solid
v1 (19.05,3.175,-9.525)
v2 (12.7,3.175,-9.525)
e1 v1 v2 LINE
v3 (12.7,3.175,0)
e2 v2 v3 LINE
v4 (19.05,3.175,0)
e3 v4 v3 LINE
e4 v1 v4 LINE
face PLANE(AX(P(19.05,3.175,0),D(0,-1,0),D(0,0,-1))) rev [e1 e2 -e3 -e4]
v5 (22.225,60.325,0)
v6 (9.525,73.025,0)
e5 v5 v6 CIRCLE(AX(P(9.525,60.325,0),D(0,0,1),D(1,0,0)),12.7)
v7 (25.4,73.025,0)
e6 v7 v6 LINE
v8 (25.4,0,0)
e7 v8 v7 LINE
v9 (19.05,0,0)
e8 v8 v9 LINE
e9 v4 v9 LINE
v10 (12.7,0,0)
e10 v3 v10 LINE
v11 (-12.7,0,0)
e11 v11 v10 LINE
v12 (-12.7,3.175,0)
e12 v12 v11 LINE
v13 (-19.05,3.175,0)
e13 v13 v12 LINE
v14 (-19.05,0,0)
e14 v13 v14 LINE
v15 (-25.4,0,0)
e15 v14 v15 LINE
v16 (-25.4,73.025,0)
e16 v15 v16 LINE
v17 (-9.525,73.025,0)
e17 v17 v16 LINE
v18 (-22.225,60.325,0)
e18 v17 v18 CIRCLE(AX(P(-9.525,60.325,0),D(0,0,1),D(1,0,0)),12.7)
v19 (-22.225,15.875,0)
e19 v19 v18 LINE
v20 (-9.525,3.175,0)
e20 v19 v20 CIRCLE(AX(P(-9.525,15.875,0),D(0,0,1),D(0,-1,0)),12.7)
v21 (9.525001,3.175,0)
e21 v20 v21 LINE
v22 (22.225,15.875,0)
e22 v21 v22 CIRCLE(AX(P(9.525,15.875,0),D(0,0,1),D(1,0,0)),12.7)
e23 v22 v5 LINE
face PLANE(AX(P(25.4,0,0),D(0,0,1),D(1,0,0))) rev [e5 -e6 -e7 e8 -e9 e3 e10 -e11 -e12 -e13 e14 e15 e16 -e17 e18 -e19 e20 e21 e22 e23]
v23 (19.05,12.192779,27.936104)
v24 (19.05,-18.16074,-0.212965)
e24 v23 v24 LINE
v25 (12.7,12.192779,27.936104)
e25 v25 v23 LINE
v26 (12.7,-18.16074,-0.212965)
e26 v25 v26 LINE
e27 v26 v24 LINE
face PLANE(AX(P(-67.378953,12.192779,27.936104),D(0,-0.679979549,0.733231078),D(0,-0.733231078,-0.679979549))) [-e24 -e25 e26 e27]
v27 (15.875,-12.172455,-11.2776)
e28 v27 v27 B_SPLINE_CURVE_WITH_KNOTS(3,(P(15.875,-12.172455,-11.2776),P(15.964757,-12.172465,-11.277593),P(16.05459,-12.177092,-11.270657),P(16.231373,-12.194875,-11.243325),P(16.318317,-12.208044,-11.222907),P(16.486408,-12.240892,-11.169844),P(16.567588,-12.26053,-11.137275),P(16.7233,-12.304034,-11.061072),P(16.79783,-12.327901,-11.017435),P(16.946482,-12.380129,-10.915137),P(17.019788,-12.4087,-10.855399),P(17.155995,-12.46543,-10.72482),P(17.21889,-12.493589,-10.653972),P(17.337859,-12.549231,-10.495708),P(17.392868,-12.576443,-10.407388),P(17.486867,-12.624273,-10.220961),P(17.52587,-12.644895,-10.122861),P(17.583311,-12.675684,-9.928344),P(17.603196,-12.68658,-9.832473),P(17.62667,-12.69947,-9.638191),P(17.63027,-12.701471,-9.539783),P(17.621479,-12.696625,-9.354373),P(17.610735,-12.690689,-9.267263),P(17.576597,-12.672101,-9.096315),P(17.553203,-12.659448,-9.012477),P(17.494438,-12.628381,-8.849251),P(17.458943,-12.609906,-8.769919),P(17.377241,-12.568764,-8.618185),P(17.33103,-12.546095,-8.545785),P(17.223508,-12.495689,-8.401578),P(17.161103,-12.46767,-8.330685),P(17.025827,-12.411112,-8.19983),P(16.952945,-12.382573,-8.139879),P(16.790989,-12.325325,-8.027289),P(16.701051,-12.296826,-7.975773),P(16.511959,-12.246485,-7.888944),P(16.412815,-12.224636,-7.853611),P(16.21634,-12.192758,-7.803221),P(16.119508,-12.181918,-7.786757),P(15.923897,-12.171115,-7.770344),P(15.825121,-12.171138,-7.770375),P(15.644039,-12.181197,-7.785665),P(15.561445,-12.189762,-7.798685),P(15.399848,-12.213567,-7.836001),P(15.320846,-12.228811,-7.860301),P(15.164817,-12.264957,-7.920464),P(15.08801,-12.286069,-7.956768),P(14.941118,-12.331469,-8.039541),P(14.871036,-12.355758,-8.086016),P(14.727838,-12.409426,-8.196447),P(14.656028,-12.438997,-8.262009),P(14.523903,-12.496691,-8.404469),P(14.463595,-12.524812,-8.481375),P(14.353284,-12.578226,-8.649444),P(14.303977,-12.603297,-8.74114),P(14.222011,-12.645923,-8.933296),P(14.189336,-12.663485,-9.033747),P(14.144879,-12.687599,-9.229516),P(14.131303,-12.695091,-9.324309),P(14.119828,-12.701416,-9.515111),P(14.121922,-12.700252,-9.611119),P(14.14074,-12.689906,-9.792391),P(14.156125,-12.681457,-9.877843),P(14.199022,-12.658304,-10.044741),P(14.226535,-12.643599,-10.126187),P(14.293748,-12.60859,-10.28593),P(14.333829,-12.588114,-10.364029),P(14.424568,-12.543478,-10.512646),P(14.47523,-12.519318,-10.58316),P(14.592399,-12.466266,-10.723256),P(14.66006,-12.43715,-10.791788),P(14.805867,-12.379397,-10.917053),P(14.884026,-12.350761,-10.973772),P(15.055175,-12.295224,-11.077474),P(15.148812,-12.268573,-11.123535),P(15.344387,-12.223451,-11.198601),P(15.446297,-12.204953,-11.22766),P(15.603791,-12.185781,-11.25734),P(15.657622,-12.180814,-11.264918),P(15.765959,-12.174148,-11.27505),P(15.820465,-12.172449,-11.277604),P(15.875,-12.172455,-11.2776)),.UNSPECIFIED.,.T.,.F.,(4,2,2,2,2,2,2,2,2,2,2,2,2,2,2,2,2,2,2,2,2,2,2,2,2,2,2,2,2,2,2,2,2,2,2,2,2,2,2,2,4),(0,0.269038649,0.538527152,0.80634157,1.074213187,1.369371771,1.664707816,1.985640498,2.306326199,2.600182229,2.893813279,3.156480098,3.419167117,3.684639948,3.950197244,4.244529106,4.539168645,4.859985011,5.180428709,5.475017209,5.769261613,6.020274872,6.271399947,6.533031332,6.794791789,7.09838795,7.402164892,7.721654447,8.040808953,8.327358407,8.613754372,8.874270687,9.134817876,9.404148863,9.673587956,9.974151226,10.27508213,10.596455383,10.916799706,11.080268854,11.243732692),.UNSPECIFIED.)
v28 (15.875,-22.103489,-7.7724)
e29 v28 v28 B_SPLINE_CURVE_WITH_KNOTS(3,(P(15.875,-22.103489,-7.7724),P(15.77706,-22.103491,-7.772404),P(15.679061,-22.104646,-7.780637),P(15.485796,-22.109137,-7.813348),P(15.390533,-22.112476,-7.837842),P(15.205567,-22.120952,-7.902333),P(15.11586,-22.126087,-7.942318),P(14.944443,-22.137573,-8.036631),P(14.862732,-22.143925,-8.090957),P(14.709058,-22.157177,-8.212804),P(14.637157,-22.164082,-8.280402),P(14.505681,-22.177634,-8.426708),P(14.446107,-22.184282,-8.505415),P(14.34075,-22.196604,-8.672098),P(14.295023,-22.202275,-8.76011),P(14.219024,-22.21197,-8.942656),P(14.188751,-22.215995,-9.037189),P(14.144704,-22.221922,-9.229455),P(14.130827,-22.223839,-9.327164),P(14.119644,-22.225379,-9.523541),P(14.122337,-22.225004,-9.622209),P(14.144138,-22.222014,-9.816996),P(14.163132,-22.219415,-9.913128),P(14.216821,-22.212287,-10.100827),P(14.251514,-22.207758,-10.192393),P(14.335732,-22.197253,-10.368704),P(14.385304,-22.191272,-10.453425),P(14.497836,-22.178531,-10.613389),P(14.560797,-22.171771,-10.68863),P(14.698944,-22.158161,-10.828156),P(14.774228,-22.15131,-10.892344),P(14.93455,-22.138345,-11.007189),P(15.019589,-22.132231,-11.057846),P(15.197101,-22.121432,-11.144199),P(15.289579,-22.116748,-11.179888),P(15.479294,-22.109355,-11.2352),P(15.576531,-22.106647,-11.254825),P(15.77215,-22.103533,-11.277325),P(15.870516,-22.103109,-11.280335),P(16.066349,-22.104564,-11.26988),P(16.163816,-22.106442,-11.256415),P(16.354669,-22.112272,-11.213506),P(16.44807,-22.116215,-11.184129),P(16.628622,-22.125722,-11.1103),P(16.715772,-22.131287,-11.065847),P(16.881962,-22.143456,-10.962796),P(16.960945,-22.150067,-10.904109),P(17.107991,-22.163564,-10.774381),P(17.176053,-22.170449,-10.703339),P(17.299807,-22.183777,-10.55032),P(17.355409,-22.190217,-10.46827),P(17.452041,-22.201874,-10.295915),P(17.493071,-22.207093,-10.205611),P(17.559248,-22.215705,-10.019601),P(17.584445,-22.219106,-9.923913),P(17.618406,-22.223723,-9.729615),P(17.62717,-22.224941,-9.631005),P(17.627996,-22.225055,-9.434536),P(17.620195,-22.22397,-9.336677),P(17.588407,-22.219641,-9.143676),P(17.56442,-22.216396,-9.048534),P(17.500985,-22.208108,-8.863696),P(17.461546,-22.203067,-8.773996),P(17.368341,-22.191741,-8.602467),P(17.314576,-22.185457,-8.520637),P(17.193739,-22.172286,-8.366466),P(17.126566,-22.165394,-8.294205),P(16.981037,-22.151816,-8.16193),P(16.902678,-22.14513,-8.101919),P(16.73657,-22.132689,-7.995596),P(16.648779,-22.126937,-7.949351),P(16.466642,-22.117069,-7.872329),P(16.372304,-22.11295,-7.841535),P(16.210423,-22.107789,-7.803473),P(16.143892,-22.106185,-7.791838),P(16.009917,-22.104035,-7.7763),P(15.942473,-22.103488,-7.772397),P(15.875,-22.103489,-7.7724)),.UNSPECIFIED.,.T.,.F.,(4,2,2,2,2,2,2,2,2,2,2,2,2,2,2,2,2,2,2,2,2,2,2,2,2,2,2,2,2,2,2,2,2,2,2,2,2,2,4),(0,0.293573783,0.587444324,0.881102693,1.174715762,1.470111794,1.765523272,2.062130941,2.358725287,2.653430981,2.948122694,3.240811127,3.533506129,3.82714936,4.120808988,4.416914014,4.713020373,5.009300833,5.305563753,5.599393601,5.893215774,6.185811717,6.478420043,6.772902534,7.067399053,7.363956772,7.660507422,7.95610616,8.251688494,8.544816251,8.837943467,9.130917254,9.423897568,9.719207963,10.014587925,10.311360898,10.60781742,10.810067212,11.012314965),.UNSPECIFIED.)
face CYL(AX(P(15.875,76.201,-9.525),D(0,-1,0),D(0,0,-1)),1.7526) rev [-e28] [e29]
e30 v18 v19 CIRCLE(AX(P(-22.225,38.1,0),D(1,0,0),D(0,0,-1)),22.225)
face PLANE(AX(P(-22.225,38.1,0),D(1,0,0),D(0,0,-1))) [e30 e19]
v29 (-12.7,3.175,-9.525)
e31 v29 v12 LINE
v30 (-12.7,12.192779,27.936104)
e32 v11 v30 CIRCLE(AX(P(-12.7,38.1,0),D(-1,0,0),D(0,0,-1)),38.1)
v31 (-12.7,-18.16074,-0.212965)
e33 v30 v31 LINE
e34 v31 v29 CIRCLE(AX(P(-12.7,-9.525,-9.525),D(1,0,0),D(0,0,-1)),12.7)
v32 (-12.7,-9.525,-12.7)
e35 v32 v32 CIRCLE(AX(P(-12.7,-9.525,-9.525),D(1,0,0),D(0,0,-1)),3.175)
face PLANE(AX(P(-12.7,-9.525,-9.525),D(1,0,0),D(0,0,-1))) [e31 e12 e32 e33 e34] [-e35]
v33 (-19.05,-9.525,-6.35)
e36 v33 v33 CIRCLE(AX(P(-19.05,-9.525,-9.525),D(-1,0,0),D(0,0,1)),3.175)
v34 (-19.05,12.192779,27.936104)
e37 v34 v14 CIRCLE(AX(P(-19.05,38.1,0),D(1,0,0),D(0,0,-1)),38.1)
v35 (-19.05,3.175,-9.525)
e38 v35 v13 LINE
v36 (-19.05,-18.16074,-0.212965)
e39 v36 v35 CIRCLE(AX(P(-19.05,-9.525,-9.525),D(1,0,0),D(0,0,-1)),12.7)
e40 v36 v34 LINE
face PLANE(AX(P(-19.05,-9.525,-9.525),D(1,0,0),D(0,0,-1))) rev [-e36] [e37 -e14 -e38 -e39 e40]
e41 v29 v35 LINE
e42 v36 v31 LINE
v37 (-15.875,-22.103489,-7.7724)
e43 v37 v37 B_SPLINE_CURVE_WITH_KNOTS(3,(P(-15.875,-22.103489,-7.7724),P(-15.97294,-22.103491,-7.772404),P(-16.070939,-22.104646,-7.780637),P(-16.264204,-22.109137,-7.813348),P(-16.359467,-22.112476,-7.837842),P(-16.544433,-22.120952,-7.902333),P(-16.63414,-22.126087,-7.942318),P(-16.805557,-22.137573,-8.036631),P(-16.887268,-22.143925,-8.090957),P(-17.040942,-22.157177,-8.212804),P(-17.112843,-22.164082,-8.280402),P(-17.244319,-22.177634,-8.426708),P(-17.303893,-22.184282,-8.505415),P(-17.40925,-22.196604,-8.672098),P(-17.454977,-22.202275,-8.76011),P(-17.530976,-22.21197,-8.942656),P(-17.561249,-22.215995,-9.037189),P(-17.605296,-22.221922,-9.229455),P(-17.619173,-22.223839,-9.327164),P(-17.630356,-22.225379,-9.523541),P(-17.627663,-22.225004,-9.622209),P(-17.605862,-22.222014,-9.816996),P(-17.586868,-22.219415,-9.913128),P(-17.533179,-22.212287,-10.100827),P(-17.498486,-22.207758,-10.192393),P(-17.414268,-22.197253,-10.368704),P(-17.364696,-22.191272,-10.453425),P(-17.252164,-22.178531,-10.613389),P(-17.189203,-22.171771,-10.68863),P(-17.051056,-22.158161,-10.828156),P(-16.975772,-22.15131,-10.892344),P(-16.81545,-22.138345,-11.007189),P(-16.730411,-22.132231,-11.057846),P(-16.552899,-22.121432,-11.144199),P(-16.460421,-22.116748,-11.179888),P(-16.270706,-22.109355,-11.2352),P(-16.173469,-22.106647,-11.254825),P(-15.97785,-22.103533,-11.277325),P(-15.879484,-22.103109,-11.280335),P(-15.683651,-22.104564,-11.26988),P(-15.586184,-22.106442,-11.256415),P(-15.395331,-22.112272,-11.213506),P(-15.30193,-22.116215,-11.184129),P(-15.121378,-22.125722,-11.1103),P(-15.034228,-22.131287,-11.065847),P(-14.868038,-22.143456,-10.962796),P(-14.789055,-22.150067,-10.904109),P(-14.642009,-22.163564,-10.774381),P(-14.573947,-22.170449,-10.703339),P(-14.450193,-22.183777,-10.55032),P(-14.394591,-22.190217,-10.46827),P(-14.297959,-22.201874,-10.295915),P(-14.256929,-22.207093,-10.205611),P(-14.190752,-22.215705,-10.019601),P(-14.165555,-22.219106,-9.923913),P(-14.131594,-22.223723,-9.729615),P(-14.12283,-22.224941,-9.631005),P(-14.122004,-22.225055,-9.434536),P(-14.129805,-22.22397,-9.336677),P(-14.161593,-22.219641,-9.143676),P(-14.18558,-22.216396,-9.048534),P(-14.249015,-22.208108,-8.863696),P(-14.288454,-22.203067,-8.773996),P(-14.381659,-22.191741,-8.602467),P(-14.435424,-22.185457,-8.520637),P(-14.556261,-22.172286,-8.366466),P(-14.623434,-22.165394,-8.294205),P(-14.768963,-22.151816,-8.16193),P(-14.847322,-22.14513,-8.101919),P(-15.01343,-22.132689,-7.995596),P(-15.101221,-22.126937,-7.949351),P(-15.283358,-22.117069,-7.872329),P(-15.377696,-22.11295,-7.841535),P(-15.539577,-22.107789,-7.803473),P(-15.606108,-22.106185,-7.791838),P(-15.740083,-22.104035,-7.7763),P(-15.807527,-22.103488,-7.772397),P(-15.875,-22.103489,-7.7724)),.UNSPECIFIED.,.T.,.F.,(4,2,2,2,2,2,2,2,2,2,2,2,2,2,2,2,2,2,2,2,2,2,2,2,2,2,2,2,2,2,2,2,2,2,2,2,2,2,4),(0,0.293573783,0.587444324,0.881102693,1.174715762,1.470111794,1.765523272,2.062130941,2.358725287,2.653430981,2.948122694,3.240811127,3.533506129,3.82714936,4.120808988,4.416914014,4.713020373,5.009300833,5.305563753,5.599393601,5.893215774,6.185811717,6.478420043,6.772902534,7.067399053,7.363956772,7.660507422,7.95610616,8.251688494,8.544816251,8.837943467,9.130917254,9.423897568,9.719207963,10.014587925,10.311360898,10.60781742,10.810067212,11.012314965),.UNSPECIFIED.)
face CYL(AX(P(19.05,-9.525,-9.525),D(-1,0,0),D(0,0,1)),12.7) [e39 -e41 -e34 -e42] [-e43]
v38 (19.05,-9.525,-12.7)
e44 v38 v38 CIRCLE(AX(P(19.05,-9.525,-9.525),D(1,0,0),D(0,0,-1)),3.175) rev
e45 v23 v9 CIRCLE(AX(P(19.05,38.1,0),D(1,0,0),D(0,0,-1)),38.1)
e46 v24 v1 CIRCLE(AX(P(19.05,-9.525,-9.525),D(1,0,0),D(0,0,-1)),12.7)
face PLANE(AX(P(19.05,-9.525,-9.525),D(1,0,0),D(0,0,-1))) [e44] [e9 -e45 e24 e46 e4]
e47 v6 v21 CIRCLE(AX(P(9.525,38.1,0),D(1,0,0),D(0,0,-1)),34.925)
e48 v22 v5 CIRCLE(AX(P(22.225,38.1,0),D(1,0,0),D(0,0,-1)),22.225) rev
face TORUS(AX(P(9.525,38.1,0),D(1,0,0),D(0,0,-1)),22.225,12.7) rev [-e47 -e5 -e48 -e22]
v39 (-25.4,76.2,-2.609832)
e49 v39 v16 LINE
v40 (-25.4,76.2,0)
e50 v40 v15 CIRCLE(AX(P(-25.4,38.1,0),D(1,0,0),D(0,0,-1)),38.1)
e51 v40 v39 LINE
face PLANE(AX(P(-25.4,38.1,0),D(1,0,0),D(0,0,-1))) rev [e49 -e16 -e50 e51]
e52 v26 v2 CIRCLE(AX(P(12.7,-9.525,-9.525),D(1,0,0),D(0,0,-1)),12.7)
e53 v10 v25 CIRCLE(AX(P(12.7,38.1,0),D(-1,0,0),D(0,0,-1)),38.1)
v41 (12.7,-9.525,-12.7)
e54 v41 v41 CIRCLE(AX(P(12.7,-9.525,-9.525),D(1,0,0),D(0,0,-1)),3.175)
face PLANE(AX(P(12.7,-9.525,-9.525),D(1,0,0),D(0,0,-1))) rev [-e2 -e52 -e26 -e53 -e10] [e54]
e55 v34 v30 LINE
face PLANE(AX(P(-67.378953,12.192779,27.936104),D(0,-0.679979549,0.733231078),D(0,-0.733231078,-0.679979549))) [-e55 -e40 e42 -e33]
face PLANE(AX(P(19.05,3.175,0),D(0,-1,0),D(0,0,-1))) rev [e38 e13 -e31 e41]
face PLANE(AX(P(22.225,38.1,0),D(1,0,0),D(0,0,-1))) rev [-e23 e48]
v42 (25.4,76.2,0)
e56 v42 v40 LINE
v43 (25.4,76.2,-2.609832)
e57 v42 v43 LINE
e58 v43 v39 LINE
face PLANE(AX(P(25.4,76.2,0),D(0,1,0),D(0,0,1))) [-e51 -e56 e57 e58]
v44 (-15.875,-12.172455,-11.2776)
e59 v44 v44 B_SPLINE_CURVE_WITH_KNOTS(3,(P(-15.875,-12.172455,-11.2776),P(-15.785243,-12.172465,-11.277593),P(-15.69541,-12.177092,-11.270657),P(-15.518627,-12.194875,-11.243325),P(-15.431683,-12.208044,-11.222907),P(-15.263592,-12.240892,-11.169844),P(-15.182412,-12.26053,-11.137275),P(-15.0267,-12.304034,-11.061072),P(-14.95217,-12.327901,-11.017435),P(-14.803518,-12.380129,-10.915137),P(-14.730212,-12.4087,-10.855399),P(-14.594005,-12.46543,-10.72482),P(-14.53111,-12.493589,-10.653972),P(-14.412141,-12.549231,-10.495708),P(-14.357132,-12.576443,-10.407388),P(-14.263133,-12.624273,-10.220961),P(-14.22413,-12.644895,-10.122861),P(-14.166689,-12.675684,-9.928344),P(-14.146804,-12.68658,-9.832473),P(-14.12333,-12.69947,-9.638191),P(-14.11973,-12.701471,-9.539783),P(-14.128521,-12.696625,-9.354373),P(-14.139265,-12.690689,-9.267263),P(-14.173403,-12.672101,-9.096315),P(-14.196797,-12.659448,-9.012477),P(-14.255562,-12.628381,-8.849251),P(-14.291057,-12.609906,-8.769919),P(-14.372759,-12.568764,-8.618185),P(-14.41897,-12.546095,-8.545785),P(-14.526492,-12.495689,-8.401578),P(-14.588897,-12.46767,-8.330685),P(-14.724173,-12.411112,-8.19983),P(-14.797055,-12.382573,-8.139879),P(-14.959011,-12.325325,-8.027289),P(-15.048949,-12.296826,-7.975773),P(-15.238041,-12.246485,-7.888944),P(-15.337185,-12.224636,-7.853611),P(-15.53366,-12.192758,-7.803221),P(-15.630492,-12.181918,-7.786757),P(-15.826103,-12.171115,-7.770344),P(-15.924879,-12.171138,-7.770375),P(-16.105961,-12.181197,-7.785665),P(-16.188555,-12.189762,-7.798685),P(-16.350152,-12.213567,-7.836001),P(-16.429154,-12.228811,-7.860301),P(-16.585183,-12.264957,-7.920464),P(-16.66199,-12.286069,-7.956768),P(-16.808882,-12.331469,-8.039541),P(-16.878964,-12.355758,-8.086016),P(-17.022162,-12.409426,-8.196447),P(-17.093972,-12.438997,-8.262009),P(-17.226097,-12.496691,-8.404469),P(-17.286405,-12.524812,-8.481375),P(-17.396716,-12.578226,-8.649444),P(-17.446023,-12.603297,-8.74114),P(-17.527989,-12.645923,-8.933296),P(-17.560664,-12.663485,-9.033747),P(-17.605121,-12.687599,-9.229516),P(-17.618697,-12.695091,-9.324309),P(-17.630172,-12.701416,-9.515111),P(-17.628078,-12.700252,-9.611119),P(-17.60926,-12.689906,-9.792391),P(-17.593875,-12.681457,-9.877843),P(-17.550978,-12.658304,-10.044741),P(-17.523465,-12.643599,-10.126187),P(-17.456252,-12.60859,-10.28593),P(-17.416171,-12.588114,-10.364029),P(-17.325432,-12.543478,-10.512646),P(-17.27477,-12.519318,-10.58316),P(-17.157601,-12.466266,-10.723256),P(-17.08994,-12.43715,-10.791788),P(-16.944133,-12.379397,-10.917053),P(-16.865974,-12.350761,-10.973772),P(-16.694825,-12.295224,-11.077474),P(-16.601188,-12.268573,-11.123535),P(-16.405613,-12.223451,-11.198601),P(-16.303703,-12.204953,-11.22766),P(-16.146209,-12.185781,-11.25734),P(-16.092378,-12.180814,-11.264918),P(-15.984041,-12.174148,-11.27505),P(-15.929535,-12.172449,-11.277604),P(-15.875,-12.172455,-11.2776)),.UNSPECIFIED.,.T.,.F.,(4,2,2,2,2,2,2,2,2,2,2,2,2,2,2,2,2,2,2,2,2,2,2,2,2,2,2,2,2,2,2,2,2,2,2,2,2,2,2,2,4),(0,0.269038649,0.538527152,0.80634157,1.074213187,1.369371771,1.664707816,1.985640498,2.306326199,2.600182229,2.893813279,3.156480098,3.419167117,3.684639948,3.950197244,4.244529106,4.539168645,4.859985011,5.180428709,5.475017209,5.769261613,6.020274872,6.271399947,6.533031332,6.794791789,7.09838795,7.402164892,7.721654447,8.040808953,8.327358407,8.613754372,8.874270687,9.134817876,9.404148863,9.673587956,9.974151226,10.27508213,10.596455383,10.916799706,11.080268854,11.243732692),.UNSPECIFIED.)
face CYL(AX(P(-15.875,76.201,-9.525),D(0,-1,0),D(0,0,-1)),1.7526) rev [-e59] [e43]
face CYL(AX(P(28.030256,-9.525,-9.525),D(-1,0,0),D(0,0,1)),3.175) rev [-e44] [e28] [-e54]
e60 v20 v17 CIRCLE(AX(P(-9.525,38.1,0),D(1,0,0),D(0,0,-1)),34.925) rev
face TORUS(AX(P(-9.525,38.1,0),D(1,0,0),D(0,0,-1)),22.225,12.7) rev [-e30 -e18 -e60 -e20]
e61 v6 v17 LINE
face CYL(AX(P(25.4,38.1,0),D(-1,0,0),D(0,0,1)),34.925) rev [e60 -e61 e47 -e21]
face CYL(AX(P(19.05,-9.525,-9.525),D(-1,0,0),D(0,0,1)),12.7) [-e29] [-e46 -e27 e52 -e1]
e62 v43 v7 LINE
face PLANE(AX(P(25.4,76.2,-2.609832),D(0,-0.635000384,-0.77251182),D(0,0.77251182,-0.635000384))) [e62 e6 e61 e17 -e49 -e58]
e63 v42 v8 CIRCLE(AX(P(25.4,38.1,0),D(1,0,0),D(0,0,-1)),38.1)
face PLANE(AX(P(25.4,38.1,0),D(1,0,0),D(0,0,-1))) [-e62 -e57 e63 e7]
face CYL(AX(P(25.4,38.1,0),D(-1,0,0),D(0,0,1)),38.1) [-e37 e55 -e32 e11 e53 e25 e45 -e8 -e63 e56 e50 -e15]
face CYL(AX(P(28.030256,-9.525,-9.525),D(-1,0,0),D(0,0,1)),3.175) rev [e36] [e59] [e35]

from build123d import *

# Parameters (mm, degrees)
BOSS_EXTRUDE1_DEPTH                 = 25.4
SHELL1_T                            = -3.175
SKETCH4_R                           = 12.7
BOSS_EXTRUDE3_DEPTH                 = 19.05
BOSS_EXTRUDE4_DEPTH                 = 19.05
SKETCH6_R                           = 12.7
CUT_EXTRUDE2_DEPTH                  = 12.7
CUT_EXTRUDE3_START                  = 12.7
SKETCH6_2_R                         = 12.7
CUT_EXTRUDE3_DEPTH                  = 12.7
CUT_EXTRUDE4_REACH                  = 98.093
SKETCH7_R                           = 3.175
BOSS_EXTRUDE5_REACH                 = 98.093
CUT_EXTRUDE5_DEPTH                  = 12.7
BOSS_EXTRUDE6_DEPTH                 = 25.4
FILLET2_R                           = 12.7
CUT_EXTRUDE6_REACH                  = 109.812
CUT_EXTRUDE6_END_RADIUS             = 3.175
SKETCH12_R                          = 1.7526
CUT_EXTRUDE6_DIRECTION_2_REACH      = 109.812
CUT_EXTRUDE6_DIRECTION_2_END_RADIUS = 12.7


with BuildPart() as part:
    # Sketch2 → Boss-Extrude1 (new, symmetric)
    with BuildSketch(Plane(origin=(0, 0, 0), x_dir=(0, 0, -1), z_dir=(1, 0, 0))):
        with BuildLine():
            Line((0, 0), (0, 76.2))
            ThreePointArc((0, 76.2), (-38.1, 38.1), (0, 0))
        make_face()
    extrude(amount=BOSS_EXTRUDE1_DEPTH, both=True)

    # Shell1
    shell1_openings = [part.faces().sort_by_distance(p)[0] for p in [
        (0, 38.1, 0),
    ]]
    offset(amount=SHELL1_T, openings=shell1_openings)



with BuildPart() as body_2:
    # Sketch4 → Boss-Extrude3 (new, symmetric)
    with BuildSketch(Plane(origin=(0, 0, 0), x_dir=(0, 0, -1), z_dir=(1, 0, 0))):
        with Locations(Location((9.525, -9.525, 0), (0, 0, 180))):
            Circle(SKETCH4_R)
    extrude(amount=BOSS_EXTRUDE3_DEPTH, both=True)


with BuildPart() as part_1:
    add(part.part)

    add(body_2.part)  # Boss-Extrude4 merges body 2
    # Sketch5 → Boss-Extrude4 (add, symmetric)
    with BuildSketch(Plane(origin=(0, 0, 0), x_dir=(0, 0, -1), z_dir=(1, 0, 0))):
        with BuildLine():
            Line((0, 3.175), (0, 0))
            Line((0, 0), (1.124739587, 0))
            ThreePointArc((1.124739587, 0), (5.034871939, 2.354762203), (9.525, 3.175))
            Line((9.525, 3.175), (0, 3.175))
        make_face()
    extrude(amount=BOSS_EXTRUDE4_DEPTH, both=True)

    # Sketch6 → Cut-Extrude2 (cut)
    with BuildSketch(Plane(origin=(0, 0, 0), x_dir=(0, 0, -1), z_dir=(1, 0, 0))):
        with Locations((9.525, -9.525)):
            Circle(SKETCH6_R)
    extrude(amount=-CUT_EXTRUDE2_DEPTH, mode=Mode.SUBTRACT)

    # Sketch6<2> → Cut-Extrude3 (cut)
    with BuildSketch(Plane(origin=(0, 0, 0), x_dir=(0, 0, -1), z_dir=(1, 0, 0)).offset(CUT_EXTRUDE3_START)):
        with Locations((9.525, -9.525)):
            Circle(SKETCH6_2_R)
    extrude(amount=-CUT_EXTRUDE3_DEPTH, mode=Mode.SUBTRACT)

    # Cut-Extrude4: up to this face of the body (flat: up to its plane)
    cut_extrude4_end = Plane(part_1.part.faces().sort_by_distance((19.05, -9.258016607, -9.360446087))[0])
    # Sketch7 → Cut-Extrude4 (cut, up to the picked face)
    with BuildSketch(Plane.ZY.offset(19.05), mode=Mode.PRIVATE) as cut_extrude4_sk1:
        with Locations(Location((-9.525, -9.525, 0), (0, 0, 180))):
            Circle(SKETCH7_R)
    cut_extrude4_tool1 = split(extrude(cut_extrude4_sk1.sketch, amount=-CUT_EXTRUDE4_REACH, mode=Mode.PRIVATE), bisect_by=cut_extrude4_end, keep=Keep.BOTH, mode=Mode.PRIVATE)
    add(cut_extrude4_tool1.solids().sort_by(Axis((-19.05, -9.525, -9.525), (1, 0, 0)))[0], mode=Mode.SUBTRACT)

    # Boss-Extrude5: up to this face of the body (flat: up to its plane)
    boss_extrude5_end = Plane(part_1.part.faces().sort_by_distance((-19.05, 2.815789755, -4.7625))[0])
    # Sketch8 → Boss-Extrude5 (add, up to the picked face)
    with BuildSketch(Plane(origin=(19.05, 0, 0), x_dir=(0, 0, -1), z_dir=(1, 0, 0)), mode=Mode.PRIVATE) as boss_extrude5_sk1:
        with BuildLine():
            Line((-27.936104056, 12.192779189), (0.212965315, -18.16074027))
            Line((0.212965315, -18.16074027), (5.034871939, -21.404762203))
            Line((5.034871939, -21.404762203), (1.124739587, 0))
            Line((1.124739587, 0), (0, 3.175))
            ThreePointArc((0, 3.175), (-13.704863106, 5.9762961), (-25.211222013, 13.9308066))
            Line((-25.211222013, 13.9308066), (-27.936104056, 12.192779189))
        make_face()
    boss_extrude5_tool1 = split(extrude(boss_extrude5_sk1.sketch, amount=-BOSS_EXTRUDE5_REACH, mode=Mode.PRIVATE), bisect_by=boss_extrude5_end, keep=Keep.BOTH, mode=Mode.PRIVATE)
    add(boss_extrude5_tool1.solids().sort_by(Axis((19.05, -2.840531, 7.724646), (-1, 0, 0)))[0])

    # Sketch9 → Cut-Extrude5 (cut, symmetric)
    with BuildSketch(Plane(origin=(0, 0, 0), x_dir=(0, 0, -1), z_dir=(1, 0, 0))):
        with BuildLine():
            Line((0, 3.175), (0, 0))
            ThreePointArc((0, 0), (-15.240486985, 3.180985746), (-27.936104056, 12.192779189))
            Line((-27.936104056, 12.192779189), (0.212965315, -18.16074027))
            ThreePointArc((0.212965315, -18.16074027), (21.164671418, -14.605162328), (9.525, 3.175))
            Line((9.525, 3.175), (0, 3.175))
        make_face()
    extrude(amount=CUT_EXTRUDE5_DEPTH, both=True, mode=Mode.SUBTRACT)

    # Sketch11 → Boss-Extrude6 (add, symmetric)
    with BuildSketch(Plane(origin=(0, 0, 0), x_dir=(0, 0, -1), z_dir=(1, 0, 0))):
        Polygon((2.609832197, 76.2), (0, 76.2), (0, 73.025), align=None)
    extrude(amount=BOSS_EXTRUDE6_DEPTH, both=True)

    # Fillet2
    # the kernel refuses this fillet: 12.7 mm, written as the material it adds along each edge
    with BuildSketch(Plane(origin=(-22.225, 38.1, 0), x_dir=(0, 1, 0), z_dir=(0, 0, -1))) as fillet2_piece_1:
        with BuildLine():
            CenterArc((34.925 - FILLET2_R, FILLET2_R), FILLET2_R, 270, 90)
            Line((34.925 - FILLET2_R, 0), (34.925, 0))
            Line((34.925, 0), (34.925, FILLET2_R))
        make_face()
    revolve(axis=Axis((-22.225, 38.1, 0), (1, 0, 0)), revolution_arc=180)
    with BuildSketch(Plane(origin=(22.225, 38.1, 0), x_dir=(0, 1, 0), z_dir=(0, 0, -1))) as fillet2_piece_2:
        with BuildLine():
            CenterArc((34.925 - FILLET2_R, -FILLET2_R), FILLET2_R, 0, 90)
            Line((34.925 - FILLET2_R, 0), (34.925, 0))
            Line((34.925, 0), (34.925, -FILLET2_R))
        make_face()
    revolve(axis=Axis((22.225, 38.1, 0), (1, 0, 0)), revolution_arc=180)

    # Cut-Extrude6: up to this cylinder (the profile starts outside it)
    cut_extrude6_end = Plane(origin=(0, -9.525, -9.525), z_dir=(-1, 0, 0)) * Cylinder(CUT_EXTRUDE6_END_RADIUS, 258.724, mode=Mode.PRIVATE)
    # Sketch12 → Cut-Extrude6 (cut, up to the surface)
    with BuildSketch(Plane(origin=(0, -21.404762203, 0), x_dir=(1, 0, 0), z_dir=(0, 1, 0)), mode=Mode.PRIVATE) as cut_extrude6_sk1:
        with Locations(Location((15.875, 9.525, 0), (0, 0, 90))):
            Circle(SKETCH12_R)
    cut_extrude6_tool1 = extrude(cut_extrude6_sk1.sketch, amount=CUT_EXTRUDE6_REACH, mode=Mode.PRIVATE) - cut_extrude6_end
    add(cut_extrude6_tool1.solids().sort_by_distance((15.875, -21.404762, -9.525))[0], mode=Mode.SUBTRACT)
    # Sketch12 → Cut-Extrude6 (cut, up to the surface)
    with BuildSketch(Plane(origin=(0, -21.404762203, 0), x_dir=(1, 0, 0), z_dir=(0, 1, 0)), mode=Mode.PRIVATE) as cut_extrude6_sk2:
        with Locations(Location((-15.875, 9.525, 0), (0, 0, 90))):
            Circle(SKETCH12_R)
    cut_extrude6_tool2 = extrude(cut_extrude6_sk2.sketch, amount=CUT_EXTRUDE6_REACH, mode=Mode.PRIVATE) - cut_extrude6_end
    add(cut_extrude6_tool2.solids().sort_by_distance((-15.875, -21.404762, -9.525))[0], mode=Mode.SUBTRACT)

    # Cut-Extrude6 direction 2: up to this cylinder (the profile starts inside it)
    cut_extrude6_direction_2_end = Plane(origin=(0, -9.525, -9.525), z_dir=(-1, 0, 0)) * Cylinder(CUT_EXTRUDE6_DIRECTION_2_END_RADIUS, 277.774, mode=Mode.PRIVATE)
    # Sketch12 → Cut-Extrude6 direction 2 (cut, up to the surface)
    with BuildSketch(Plane(origin=(0, -21.404762203, 0), x_dir=(1, 0, 0), z_dir=(0, 1, 0)), mode=Mode.PRIVATE) as cut_extrude6_direction_2_sk1:
        with Locations(Location((15.875, 9.525, 0), (0, 0, 90))):
            Circle(SKETCH12_R)
    cut_extrude6_direction_2_tool1 = extrude(cut_extrude6_direction_2_sk1.sketch, amount=-CUT_EXTRUDE6_DIRECTION_2_REACH, mode=Mode.PRIVATE) & cut_extrude6_direction_2_end
    add(cut_extrude6_direction_2_tool1.solids().sort_by_distance((15.875, -21.404762, -9.525))[0], mode=Mode.SUBTRACT)
    # Sketch12 → Cut-Extrude6 direction 2 (cut, up to the surface)
    with BuildSketch(Plane(origin=(0, -21.404762203, 0), x_dir=(1, 0, 0), z_dir=(0, 1, 0)), mode=Mode.PRIVATE) as cut_extrude6_direction_2_sk2:
        with Locations(Location((-15.875, 9.525, 0), (0, 0, 90))):
            Circle(SKETCH12_R)
    cut_extrude6_direction_2_tool2 = extrude(cut_extrude6_direction_2_sk2.sketch, amount=-CUT_EXTRUDE6_DIRECTION_2_REACH, mode=Mode.PRIVATE) & cut_extrude6_direction_2_end
    add(cut_extrude6_direction_2_tool2.solids().sort_by_distance((-15.875, -21.404762, -9.525))[0], mode=Mode.SUBTRACT)


solid = part_1.part
